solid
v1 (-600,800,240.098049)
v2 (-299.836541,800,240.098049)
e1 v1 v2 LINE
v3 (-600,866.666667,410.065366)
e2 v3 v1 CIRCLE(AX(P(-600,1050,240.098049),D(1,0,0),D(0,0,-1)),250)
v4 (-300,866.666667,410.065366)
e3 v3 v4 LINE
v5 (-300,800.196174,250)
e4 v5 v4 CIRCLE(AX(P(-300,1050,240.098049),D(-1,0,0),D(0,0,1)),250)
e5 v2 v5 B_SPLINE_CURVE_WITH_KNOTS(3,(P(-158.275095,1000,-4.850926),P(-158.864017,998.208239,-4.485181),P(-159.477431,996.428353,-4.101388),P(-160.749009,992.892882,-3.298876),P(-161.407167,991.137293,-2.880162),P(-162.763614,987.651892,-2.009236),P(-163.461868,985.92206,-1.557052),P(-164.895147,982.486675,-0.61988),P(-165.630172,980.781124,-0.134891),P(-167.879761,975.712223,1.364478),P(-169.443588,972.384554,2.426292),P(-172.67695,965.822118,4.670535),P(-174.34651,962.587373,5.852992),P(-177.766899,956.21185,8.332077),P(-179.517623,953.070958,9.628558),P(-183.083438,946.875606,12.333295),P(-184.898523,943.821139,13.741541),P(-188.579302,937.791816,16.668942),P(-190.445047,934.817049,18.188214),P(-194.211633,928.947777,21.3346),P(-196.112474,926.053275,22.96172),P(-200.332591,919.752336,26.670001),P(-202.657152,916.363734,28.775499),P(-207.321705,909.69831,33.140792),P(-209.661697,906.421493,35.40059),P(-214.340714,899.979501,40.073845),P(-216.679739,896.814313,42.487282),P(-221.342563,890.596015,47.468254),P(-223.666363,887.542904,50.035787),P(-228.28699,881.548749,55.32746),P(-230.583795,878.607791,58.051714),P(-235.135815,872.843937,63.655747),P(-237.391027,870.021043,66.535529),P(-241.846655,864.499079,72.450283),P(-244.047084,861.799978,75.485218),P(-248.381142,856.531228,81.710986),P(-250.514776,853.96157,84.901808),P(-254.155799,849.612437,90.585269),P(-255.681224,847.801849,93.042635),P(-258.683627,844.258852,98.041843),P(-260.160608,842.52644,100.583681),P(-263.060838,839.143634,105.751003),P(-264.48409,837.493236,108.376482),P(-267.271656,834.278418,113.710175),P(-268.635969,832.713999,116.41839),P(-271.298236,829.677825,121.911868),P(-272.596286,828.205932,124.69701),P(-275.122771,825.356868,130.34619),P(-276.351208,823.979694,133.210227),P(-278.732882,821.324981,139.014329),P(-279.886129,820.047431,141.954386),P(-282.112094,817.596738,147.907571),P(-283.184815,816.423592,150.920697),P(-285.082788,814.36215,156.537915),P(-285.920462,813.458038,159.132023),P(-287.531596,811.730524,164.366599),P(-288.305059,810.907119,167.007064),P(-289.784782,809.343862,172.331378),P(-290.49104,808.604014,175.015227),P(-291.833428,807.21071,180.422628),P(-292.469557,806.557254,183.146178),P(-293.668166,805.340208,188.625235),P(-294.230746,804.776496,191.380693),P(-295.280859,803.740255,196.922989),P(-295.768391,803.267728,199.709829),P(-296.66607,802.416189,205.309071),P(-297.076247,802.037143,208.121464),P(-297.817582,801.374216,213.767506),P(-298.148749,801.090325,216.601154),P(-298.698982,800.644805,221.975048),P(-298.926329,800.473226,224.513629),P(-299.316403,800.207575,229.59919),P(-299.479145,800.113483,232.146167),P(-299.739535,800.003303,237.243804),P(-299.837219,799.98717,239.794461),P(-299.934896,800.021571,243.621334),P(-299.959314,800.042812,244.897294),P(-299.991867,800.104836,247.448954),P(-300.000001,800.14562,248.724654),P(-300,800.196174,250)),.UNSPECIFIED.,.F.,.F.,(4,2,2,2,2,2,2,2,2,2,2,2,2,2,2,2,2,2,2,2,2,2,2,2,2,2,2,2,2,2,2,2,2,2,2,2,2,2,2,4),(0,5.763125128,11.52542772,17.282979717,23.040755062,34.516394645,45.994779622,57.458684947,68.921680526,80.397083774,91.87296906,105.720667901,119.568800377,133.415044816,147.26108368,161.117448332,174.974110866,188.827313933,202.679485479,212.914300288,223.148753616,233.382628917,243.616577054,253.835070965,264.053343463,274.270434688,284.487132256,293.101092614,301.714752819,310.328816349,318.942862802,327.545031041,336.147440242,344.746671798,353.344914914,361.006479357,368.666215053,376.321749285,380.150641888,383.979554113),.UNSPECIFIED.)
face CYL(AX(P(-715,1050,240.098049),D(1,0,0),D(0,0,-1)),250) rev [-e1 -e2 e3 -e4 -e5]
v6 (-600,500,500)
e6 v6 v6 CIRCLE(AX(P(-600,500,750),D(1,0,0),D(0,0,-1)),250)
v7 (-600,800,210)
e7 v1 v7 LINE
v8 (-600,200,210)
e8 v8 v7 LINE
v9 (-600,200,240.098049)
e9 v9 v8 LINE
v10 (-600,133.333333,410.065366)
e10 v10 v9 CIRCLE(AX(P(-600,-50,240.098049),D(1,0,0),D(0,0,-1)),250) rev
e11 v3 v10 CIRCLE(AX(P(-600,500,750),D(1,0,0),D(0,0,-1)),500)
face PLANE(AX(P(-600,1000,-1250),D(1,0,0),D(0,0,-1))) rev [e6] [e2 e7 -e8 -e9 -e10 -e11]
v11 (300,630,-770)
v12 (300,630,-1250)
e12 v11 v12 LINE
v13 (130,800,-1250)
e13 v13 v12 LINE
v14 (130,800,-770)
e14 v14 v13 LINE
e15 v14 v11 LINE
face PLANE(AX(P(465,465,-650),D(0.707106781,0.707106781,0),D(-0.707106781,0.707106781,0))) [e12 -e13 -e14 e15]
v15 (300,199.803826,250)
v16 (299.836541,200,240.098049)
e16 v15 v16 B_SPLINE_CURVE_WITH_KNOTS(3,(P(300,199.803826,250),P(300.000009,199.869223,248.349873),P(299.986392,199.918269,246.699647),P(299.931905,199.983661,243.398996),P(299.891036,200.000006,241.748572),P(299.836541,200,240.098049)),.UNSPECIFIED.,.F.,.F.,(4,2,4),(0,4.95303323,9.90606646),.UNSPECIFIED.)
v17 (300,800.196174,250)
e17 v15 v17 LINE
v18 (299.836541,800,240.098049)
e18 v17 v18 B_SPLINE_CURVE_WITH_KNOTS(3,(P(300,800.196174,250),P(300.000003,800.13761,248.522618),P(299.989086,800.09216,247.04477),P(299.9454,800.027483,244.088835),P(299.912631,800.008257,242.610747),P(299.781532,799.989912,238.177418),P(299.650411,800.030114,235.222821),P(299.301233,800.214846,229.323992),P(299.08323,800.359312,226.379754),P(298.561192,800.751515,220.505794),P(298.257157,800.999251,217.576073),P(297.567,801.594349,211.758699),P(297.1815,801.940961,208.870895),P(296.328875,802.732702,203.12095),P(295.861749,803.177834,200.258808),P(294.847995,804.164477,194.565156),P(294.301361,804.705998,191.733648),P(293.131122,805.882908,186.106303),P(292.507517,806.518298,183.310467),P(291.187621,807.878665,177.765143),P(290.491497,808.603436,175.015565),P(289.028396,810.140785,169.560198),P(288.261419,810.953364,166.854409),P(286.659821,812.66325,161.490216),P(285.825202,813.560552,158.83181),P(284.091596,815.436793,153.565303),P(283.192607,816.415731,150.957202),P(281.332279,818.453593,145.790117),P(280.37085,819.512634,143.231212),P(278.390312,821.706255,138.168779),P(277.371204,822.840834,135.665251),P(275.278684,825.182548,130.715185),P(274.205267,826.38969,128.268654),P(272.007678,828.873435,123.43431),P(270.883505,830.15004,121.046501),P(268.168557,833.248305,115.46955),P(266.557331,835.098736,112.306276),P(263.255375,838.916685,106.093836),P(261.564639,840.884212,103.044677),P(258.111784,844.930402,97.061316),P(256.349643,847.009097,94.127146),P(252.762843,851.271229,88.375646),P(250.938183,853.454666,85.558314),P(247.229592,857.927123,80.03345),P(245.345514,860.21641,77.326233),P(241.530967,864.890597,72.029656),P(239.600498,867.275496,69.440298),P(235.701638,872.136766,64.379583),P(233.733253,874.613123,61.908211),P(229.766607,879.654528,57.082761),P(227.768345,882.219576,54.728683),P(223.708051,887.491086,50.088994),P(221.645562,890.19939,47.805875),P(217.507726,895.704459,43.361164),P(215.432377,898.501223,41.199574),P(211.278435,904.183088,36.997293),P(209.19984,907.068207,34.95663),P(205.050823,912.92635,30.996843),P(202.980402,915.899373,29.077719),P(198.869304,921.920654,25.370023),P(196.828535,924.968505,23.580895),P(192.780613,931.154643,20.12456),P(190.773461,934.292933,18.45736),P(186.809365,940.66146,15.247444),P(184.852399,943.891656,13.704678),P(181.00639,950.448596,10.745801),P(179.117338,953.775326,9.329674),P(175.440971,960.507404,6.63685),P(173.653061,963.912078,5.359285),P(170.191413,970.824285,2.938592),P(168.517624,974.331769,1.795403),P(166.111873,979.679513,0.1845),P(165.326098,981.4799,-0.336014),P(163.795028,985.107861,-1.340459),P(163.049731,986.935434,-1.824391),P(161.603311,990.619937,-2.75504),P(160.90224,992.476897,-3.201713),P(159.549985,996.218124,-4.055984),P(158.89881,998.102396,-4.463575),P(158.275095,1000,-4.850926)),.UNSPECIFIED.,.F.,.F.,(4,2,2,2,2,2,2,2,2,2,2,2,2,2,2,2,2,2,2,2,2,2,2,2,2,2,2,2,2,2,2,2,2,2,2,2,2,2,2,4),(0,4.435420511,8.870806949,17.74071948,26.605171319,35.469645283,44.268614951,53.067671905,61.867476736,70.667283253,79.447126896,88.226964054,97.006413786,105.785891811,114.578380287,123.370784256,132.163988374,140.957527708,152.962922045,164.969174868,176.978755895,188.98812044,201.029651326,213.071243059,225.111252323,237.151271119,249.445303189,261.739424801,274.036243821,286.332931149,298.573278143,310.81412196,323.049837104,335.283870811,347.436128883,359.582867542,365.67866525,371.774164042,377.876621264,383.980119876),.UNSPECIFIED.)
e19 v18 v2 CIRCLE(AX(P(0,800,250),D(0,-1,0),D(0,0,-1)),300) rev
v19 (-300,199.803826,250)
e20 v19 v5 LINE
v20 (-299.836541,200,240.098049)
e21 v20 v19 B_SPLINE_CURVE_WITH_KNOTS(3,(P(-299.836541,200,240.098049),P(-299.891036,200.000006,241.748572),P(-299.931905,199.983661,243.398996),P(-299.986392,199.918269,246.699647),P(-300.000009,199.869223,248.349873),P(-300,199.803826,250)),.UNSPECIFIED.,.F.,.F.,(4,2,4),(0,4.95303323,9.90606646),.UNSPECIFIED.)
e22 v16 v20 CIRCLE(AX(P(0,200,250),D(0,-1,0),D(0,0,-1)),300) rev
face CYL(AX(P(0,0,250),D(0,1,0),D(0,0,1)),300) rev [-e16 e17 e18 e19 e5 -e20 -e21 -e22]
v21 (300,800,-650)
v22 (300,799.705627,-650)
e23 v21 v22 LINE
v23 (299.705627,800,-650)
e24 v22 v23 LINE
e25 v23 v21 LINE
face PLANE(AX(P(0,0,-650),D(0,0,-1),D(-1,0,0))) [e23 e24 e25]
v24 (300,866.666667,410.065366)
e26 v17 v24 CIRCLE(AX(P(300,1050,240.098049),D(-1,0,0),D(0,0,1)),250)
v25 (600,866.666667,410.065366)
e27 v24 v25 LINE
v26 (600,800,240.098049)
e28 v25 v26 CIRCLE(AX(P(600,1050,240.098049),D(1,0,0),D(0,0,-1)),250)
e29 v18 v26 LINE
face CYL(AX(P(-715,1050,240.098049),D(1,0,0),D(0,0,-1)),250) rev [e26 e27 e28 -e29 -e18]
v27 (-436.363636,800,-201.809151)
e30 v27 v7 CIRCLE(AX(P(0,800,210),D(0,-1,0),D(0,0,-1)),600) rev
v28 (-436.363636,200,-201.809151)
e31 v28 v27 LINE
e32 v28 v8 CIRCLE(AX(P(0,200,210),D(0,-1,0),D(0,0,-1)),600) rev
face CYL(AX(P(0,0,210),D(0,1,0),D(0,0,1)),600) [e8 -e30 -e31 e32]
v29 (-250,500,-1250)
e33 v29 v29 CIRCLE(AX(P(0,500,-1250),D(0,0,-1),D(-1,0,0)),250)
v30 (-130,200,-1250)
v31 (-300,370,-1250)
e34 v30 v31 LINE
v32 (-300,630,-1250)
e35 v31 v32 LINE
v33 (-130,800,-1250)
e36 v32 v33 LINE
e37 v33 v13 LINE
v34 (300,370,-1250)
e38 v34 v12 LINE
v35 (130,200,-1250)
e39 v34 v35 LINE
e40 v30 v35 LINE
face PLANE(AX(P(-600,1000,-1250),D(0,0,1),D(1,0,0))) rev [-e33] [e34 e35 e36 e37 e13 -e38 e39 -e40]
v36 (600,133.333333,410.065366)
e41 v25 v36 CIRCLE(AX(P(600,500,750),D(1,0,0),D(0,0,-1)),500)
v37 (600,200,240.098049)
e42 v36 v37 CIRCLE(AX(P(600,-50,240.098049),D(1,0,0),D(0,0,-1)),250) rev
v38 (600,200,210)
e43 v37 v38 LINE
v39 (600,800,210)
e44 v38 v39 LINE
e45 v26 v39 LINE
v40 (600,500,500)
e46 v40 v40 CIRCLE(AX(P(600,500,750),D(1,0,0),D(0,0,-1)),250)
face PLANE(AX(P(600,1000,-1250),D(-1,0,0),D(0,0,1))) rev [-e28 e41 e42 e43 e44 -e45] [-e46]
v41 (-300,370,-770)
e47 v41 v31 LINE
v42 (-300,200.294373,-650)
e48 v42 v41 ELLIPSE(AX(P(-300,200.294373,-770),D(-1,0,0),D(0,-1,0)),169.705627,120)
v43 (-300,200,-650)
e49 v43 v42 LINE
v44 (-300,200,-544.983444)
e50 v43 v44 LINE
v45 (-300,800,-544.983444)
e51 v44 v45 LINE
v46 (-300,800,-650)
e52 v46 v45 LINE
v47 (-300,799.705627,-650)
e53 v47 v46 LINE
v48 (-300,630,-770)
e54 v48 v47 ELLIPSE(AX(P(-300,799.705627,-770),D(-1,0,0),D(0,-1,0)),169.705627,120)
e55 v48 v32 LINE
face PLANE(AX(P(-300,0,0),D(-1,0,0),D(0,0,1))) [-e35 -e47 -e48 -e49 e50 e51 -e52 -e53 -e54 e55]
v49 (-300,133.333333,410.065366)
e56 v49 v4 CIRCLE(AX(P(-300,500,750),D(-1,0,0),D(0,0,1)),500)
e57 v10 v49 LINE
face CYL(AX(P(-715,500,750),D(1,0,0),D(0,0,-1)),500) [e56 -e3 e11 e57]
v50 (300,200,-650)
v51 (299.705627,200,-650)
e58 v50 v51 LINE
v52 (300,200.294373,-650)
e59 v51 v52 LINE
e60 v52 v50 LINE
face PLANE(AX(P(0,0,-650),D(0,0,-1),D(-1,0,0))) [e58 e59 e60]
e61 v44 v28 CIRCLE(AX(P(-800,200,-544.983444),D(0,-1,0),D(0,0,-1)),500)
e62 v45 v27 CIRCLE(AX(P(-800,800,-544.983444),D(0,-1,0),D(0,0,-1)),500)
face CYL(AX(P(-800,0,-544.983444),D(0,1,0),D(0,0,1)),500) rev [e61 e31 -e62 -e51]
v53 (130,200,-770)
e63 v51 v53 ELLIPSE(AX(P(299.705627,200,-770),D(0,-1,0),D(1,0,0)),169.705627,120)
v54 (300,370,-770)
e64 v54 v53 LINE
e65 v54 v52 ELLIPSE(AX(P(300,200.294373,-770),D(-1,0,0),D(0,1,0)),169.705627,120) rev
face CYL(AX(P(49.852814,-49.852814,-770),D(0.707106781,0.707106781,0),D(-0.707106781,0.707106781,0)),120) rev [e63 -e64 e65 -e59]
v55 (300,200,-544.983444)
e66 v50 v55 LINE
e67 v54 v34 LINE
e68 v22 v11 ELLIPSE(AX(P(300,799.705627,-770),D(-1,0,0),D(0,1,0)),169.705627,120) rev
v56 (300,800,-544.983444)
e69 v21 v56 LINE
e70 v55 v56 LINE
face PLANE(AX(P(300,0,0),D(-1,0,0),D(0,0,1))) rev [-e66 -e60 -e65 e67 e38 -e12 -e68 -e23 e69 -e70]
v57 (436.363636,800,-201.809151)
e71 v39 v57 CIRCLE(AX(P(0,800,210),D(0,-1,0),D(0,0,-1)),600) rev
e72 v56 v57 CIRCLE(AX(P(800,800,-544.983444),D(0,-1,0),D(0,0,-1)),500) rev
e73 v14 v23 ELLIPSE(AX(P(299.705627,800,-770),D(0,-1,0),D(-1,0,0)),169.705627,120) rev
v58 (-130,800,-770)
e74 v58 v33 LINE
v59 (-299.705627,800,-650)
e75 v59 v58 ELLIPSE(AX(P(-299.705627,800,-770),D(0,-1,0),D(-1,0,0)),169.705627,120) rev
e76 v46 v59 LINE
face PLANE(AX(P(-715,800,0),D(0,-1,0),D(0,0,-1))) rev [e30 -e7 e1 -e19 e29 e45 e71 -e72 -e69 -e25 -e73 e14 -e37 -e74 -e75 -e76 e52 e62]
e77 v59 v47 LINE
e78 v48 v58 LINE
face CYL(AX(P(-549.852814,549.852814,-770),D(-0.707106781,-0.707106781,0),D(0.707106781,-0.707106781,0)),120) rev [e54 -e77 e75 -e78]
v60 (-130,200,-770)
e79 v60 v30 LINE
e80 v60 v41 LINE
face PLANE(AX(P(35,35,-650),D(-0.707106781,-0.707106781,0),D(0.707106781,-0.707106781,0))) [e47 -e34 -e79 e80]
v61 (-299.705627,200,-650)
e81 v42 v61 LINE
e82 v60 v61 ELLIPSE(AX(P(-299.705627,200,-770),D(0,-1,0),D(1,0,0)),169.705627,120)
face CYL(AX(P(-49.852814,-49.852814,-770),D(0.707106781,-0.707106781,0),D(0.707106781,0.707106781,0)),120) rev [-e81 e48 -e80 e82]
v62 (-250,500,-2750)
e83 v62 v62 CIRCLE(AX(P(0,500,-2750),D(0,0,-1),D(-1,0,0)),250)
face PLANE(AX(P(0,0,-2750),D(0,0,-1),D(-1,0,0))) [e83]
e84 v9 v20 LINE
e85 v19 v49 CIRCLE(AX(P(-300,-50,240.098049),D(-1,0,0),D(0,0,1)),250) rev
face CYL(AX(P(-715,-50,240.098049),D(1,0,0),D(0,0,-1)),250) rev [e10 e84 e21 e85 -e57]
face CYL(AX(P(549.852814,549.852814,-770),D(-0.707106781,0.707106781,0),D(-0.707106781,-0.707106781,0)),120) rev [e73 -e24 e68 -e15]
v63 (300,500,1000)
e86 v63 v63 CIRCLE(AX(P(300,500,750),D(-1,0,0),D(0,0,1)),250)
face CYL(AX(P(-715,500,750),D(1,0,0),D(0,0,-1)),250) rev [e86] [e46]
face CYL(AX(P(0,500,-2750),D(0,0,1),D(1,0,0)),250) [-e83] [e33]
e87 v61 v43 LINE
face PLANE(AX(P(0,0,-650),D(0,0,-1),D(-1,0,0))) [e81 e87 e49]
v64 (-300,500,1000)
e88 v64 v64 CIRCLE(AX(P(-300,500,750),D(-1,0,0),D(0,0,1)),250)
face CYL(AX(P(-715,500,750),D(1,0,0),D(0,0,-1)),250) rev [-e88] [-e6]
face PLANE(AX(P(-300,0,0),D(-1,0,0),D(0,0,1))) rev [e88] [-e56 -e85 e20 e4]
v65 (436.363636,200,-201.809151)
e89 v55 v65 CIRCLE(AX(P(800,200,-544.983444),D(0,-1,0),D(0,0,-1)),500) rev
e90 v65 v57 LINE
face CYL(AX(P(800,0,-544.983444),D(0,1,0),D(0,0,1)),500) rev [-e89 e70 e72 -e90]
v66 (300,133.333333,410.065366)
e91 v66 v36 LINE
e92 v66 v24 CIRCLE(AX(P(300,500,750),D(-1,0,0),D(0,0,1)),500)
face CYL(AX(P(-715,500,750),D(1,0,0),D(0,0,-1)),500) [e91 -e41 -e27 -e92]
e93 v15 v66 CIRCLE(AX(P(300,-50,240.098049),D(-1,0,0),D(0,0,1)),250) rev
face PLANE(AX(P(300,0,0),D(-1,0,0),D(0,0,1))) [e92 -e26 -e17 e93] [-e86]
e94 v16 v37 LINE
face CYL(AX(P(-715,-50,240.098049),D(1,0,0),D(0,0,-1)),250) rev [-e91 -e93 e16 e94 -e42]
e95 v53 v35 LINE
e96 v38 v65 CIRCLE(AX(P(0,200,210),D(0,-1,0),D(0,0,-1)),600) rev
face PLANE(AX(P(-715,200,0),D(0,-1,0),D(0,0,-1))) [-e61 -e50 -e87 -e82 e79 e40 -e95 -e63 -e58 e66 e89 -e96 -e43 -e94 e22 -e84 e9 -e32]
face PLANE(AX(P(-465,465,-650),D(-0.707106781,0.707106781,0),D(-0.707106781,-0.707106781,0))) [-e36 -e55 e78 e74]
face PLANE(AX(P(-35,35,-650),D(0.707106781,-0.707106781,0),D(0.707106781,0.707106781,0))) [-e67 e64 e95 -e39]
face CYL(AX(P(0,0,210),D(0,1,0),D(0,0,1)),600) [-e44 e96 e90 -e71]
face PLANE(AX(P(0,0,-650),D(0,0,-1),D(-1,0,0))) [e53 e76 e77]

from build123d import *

# Parameters (mm, degrees)
SKETCH1_W           = 1200
SKETCH1_H           = 2500
BOSS_EXTRUDE1_DEPTH = 1000
CUT_EXTRUDE1_DEPTH  = 1000
SKETCH3_R           = 250
CUT_EXTRUDE4_DEPTH  = 1315
CUT_EXTRUDE9_DEPTH  = 600
SKETCH4_3_R         = 250
BOSS_EXTRUDE2_DEPTH = 1500
FILLET1_R           = 120
FILLET2_R           = 120
FILLET3_R           = 120
FILLET4_R           = 120


with BuildPart() as part:
    # Sketch1 → Boss-Extrude1 (new body)
    with BuildSketch(Plane(origin=(0, 0, 0), x_dir=(1, 0, 0), z_dir=(0, 1, 0))):
        Rectangle(SKETCH1_W, SKETCH1_H)
    extrude(amount=BOSS_EXTRUDE1_DEPTH)

    # Sketch2 → Cut-Extrude1 (cut)
    with BuildSketch(Plane(origin=(0, 1000, 0), x_dir=(1, 0, 0), z_dir=(0, 1, 0))):
        with BuildLine():
            ThreePointArc((300, -250), (0, 50), (-300, -250))
            Line((-300, -250), (-300, -1250))
            Line((-300, -1250), (300, -1250))
            Line((300, -1250), (300, -250))
        make_face()
        with BuildLine():
            Line((600, 1250), (300, 1250))
            Line((300, 1250), (300, 544.983443527))
            ThreePointArc((300, 544.983443527), (335.339811358, 360.346207058), (436.363636364, 201.809151015))
            ThreePointArc((436.363636364, 201.809151015), (557.592226956, 11.564682291), (600, -210.000003168))
            Line((600, -210.000003168), (600, 1250))
        make_face()
        with BuildLine():
            Line((-300, 544.983443527), (-300, 1250))
            Line((-300, 1250), (-600, 1250))
            Line((-600, 1250), (-600, -210))
            ThreePointArc((-600, -210), (-557.592226371, 11.564683763), (-436.363636364, 201.809151015))
            ThreePointArc((-436.363636364, 201.809151015), (-335.339811358, 360.346207058), (-300, 544.983443527))
        make_face()
    extrude(amount=-CUT_EXTRUDE1_DEPTH, mode=Mode.SUBTRACT)

    # Sketch3 → Cut-Extrude4 (cut)
    with BuildSketch(Plane(origin=(600, 0, 0), x_dir=(0, 0, -1), z_dir=(1, 0, 0))):
        with BuildLine():
            ThreePointArc((-410.06536576, 866.666666667), (-331.385141558, 817.262665937), (-240.098048641, 800))
            Line((-240.098048641, 800), (1250, 800))
            Line((1250, 800), (1250, 1000))
            Line((1250, 1000), (-750, 1000))
            ThreePointArc((-750, 1000), (-567.425814165, 965.474668126), (-410.06536576, 866.666666667))
        make_face()
        with BuildLine():
            Line((-750, 0), (1250, 0))
            Line((1250, 0), (1250, 200))
            Line((1250, 200), (-240.098048641, 200))
            ThreePointArc((-240.098048641, 200), (-331.385141558, 182.737334063), (-410.06536576, 133.333333333))
            ThreePointArc((-410.06536576, 133.333333333), (-567.425814165, 34.525331874), (-750, 0))
        make_face()
        with BuildLine():
            ThreePointArc((-1250, 500), (-1103.553390593, 853.553390593), (-750, 1000))
            Line((-750, 1000), (-1250, 1000))
            Line((-1250, 1000), (-1250, 500))
        make_face()
        with BuildLine():
            ThreePointArc((-750, 0), (-1103.553390593, 146.446609407), (-1250, 500))
            Line((-1250, 500), (-1250, 0))
            Line((-1250, 0), (-750, 0))
        make_face()
        with Locations((-750, 500)):
            Circle(SKETCH3_R)
    extrude(amount=-CUT_EXTRUDE4_DEPTH, mode=Mode.SUBTRACT)

    # Sketch4 → Cut-Extrude9 (cut)
    with BuildSketch(Plane(origin=(0, 0, -1250), x_dir=(-1, 0, 0), z_dir=(0, 0, -1))):
        Polygon((300, 630), (300, 800), (130, 800), align=None)
        Polygon((300, 200), (300, 370), (130, 200), align=None)
        Polygon((-300, 200), (-130, 200), (-300, 370), align=None)
        Polygon((-300, 800), (-300, 630), (-130, 800), align=None)
    extrude(amount=-CUT_EXTRUDE9_DEPTH, mode=Mode.SUBTRACT)

    # Sketch4<3> → Boss-Extrude2 (add)
    with BuildSketch(Plane(origin=(0, 0, -1250), x_dir=(-1, 0, 0), z_dir=(0, 0, -1))):
        with Locations((0, 500)):
            Circle(SKETCH4_3_R)
    extrude(amount=BOSS_EXTRUDE2_DEPTH)

    # Fillet1
    fillet1_edges = [part.edges().sort_by_distance(p)[0] for p in [
        (-215, 715, -650),
    ]]
    fillet(fillet1_edges, radius=FILLET1_R)

    # Fillet2
    fillet2_edges = [part.edges().sort_by_distance(p)[0] for p in [
        (-215, 285, -650),
    ]]
    fillet(fillet2_edges, radius=FILLET2_R)

    # Fillet3
    fillet3_edges = [part.edges().sort_by_distance(p)[0] for p in [
        (215, 715, -650),
    ]]
    fillet(fillet3_edges, radius=FILLET3_R)

    # Fillet4
    fillet4_edges = [part.edges().sort_by_distance(p)[0] for p in [
        (215, 285, -650),
    ]]
    fillet(fillet4_edges, radius=FILLET4_R)


solid = part.part
